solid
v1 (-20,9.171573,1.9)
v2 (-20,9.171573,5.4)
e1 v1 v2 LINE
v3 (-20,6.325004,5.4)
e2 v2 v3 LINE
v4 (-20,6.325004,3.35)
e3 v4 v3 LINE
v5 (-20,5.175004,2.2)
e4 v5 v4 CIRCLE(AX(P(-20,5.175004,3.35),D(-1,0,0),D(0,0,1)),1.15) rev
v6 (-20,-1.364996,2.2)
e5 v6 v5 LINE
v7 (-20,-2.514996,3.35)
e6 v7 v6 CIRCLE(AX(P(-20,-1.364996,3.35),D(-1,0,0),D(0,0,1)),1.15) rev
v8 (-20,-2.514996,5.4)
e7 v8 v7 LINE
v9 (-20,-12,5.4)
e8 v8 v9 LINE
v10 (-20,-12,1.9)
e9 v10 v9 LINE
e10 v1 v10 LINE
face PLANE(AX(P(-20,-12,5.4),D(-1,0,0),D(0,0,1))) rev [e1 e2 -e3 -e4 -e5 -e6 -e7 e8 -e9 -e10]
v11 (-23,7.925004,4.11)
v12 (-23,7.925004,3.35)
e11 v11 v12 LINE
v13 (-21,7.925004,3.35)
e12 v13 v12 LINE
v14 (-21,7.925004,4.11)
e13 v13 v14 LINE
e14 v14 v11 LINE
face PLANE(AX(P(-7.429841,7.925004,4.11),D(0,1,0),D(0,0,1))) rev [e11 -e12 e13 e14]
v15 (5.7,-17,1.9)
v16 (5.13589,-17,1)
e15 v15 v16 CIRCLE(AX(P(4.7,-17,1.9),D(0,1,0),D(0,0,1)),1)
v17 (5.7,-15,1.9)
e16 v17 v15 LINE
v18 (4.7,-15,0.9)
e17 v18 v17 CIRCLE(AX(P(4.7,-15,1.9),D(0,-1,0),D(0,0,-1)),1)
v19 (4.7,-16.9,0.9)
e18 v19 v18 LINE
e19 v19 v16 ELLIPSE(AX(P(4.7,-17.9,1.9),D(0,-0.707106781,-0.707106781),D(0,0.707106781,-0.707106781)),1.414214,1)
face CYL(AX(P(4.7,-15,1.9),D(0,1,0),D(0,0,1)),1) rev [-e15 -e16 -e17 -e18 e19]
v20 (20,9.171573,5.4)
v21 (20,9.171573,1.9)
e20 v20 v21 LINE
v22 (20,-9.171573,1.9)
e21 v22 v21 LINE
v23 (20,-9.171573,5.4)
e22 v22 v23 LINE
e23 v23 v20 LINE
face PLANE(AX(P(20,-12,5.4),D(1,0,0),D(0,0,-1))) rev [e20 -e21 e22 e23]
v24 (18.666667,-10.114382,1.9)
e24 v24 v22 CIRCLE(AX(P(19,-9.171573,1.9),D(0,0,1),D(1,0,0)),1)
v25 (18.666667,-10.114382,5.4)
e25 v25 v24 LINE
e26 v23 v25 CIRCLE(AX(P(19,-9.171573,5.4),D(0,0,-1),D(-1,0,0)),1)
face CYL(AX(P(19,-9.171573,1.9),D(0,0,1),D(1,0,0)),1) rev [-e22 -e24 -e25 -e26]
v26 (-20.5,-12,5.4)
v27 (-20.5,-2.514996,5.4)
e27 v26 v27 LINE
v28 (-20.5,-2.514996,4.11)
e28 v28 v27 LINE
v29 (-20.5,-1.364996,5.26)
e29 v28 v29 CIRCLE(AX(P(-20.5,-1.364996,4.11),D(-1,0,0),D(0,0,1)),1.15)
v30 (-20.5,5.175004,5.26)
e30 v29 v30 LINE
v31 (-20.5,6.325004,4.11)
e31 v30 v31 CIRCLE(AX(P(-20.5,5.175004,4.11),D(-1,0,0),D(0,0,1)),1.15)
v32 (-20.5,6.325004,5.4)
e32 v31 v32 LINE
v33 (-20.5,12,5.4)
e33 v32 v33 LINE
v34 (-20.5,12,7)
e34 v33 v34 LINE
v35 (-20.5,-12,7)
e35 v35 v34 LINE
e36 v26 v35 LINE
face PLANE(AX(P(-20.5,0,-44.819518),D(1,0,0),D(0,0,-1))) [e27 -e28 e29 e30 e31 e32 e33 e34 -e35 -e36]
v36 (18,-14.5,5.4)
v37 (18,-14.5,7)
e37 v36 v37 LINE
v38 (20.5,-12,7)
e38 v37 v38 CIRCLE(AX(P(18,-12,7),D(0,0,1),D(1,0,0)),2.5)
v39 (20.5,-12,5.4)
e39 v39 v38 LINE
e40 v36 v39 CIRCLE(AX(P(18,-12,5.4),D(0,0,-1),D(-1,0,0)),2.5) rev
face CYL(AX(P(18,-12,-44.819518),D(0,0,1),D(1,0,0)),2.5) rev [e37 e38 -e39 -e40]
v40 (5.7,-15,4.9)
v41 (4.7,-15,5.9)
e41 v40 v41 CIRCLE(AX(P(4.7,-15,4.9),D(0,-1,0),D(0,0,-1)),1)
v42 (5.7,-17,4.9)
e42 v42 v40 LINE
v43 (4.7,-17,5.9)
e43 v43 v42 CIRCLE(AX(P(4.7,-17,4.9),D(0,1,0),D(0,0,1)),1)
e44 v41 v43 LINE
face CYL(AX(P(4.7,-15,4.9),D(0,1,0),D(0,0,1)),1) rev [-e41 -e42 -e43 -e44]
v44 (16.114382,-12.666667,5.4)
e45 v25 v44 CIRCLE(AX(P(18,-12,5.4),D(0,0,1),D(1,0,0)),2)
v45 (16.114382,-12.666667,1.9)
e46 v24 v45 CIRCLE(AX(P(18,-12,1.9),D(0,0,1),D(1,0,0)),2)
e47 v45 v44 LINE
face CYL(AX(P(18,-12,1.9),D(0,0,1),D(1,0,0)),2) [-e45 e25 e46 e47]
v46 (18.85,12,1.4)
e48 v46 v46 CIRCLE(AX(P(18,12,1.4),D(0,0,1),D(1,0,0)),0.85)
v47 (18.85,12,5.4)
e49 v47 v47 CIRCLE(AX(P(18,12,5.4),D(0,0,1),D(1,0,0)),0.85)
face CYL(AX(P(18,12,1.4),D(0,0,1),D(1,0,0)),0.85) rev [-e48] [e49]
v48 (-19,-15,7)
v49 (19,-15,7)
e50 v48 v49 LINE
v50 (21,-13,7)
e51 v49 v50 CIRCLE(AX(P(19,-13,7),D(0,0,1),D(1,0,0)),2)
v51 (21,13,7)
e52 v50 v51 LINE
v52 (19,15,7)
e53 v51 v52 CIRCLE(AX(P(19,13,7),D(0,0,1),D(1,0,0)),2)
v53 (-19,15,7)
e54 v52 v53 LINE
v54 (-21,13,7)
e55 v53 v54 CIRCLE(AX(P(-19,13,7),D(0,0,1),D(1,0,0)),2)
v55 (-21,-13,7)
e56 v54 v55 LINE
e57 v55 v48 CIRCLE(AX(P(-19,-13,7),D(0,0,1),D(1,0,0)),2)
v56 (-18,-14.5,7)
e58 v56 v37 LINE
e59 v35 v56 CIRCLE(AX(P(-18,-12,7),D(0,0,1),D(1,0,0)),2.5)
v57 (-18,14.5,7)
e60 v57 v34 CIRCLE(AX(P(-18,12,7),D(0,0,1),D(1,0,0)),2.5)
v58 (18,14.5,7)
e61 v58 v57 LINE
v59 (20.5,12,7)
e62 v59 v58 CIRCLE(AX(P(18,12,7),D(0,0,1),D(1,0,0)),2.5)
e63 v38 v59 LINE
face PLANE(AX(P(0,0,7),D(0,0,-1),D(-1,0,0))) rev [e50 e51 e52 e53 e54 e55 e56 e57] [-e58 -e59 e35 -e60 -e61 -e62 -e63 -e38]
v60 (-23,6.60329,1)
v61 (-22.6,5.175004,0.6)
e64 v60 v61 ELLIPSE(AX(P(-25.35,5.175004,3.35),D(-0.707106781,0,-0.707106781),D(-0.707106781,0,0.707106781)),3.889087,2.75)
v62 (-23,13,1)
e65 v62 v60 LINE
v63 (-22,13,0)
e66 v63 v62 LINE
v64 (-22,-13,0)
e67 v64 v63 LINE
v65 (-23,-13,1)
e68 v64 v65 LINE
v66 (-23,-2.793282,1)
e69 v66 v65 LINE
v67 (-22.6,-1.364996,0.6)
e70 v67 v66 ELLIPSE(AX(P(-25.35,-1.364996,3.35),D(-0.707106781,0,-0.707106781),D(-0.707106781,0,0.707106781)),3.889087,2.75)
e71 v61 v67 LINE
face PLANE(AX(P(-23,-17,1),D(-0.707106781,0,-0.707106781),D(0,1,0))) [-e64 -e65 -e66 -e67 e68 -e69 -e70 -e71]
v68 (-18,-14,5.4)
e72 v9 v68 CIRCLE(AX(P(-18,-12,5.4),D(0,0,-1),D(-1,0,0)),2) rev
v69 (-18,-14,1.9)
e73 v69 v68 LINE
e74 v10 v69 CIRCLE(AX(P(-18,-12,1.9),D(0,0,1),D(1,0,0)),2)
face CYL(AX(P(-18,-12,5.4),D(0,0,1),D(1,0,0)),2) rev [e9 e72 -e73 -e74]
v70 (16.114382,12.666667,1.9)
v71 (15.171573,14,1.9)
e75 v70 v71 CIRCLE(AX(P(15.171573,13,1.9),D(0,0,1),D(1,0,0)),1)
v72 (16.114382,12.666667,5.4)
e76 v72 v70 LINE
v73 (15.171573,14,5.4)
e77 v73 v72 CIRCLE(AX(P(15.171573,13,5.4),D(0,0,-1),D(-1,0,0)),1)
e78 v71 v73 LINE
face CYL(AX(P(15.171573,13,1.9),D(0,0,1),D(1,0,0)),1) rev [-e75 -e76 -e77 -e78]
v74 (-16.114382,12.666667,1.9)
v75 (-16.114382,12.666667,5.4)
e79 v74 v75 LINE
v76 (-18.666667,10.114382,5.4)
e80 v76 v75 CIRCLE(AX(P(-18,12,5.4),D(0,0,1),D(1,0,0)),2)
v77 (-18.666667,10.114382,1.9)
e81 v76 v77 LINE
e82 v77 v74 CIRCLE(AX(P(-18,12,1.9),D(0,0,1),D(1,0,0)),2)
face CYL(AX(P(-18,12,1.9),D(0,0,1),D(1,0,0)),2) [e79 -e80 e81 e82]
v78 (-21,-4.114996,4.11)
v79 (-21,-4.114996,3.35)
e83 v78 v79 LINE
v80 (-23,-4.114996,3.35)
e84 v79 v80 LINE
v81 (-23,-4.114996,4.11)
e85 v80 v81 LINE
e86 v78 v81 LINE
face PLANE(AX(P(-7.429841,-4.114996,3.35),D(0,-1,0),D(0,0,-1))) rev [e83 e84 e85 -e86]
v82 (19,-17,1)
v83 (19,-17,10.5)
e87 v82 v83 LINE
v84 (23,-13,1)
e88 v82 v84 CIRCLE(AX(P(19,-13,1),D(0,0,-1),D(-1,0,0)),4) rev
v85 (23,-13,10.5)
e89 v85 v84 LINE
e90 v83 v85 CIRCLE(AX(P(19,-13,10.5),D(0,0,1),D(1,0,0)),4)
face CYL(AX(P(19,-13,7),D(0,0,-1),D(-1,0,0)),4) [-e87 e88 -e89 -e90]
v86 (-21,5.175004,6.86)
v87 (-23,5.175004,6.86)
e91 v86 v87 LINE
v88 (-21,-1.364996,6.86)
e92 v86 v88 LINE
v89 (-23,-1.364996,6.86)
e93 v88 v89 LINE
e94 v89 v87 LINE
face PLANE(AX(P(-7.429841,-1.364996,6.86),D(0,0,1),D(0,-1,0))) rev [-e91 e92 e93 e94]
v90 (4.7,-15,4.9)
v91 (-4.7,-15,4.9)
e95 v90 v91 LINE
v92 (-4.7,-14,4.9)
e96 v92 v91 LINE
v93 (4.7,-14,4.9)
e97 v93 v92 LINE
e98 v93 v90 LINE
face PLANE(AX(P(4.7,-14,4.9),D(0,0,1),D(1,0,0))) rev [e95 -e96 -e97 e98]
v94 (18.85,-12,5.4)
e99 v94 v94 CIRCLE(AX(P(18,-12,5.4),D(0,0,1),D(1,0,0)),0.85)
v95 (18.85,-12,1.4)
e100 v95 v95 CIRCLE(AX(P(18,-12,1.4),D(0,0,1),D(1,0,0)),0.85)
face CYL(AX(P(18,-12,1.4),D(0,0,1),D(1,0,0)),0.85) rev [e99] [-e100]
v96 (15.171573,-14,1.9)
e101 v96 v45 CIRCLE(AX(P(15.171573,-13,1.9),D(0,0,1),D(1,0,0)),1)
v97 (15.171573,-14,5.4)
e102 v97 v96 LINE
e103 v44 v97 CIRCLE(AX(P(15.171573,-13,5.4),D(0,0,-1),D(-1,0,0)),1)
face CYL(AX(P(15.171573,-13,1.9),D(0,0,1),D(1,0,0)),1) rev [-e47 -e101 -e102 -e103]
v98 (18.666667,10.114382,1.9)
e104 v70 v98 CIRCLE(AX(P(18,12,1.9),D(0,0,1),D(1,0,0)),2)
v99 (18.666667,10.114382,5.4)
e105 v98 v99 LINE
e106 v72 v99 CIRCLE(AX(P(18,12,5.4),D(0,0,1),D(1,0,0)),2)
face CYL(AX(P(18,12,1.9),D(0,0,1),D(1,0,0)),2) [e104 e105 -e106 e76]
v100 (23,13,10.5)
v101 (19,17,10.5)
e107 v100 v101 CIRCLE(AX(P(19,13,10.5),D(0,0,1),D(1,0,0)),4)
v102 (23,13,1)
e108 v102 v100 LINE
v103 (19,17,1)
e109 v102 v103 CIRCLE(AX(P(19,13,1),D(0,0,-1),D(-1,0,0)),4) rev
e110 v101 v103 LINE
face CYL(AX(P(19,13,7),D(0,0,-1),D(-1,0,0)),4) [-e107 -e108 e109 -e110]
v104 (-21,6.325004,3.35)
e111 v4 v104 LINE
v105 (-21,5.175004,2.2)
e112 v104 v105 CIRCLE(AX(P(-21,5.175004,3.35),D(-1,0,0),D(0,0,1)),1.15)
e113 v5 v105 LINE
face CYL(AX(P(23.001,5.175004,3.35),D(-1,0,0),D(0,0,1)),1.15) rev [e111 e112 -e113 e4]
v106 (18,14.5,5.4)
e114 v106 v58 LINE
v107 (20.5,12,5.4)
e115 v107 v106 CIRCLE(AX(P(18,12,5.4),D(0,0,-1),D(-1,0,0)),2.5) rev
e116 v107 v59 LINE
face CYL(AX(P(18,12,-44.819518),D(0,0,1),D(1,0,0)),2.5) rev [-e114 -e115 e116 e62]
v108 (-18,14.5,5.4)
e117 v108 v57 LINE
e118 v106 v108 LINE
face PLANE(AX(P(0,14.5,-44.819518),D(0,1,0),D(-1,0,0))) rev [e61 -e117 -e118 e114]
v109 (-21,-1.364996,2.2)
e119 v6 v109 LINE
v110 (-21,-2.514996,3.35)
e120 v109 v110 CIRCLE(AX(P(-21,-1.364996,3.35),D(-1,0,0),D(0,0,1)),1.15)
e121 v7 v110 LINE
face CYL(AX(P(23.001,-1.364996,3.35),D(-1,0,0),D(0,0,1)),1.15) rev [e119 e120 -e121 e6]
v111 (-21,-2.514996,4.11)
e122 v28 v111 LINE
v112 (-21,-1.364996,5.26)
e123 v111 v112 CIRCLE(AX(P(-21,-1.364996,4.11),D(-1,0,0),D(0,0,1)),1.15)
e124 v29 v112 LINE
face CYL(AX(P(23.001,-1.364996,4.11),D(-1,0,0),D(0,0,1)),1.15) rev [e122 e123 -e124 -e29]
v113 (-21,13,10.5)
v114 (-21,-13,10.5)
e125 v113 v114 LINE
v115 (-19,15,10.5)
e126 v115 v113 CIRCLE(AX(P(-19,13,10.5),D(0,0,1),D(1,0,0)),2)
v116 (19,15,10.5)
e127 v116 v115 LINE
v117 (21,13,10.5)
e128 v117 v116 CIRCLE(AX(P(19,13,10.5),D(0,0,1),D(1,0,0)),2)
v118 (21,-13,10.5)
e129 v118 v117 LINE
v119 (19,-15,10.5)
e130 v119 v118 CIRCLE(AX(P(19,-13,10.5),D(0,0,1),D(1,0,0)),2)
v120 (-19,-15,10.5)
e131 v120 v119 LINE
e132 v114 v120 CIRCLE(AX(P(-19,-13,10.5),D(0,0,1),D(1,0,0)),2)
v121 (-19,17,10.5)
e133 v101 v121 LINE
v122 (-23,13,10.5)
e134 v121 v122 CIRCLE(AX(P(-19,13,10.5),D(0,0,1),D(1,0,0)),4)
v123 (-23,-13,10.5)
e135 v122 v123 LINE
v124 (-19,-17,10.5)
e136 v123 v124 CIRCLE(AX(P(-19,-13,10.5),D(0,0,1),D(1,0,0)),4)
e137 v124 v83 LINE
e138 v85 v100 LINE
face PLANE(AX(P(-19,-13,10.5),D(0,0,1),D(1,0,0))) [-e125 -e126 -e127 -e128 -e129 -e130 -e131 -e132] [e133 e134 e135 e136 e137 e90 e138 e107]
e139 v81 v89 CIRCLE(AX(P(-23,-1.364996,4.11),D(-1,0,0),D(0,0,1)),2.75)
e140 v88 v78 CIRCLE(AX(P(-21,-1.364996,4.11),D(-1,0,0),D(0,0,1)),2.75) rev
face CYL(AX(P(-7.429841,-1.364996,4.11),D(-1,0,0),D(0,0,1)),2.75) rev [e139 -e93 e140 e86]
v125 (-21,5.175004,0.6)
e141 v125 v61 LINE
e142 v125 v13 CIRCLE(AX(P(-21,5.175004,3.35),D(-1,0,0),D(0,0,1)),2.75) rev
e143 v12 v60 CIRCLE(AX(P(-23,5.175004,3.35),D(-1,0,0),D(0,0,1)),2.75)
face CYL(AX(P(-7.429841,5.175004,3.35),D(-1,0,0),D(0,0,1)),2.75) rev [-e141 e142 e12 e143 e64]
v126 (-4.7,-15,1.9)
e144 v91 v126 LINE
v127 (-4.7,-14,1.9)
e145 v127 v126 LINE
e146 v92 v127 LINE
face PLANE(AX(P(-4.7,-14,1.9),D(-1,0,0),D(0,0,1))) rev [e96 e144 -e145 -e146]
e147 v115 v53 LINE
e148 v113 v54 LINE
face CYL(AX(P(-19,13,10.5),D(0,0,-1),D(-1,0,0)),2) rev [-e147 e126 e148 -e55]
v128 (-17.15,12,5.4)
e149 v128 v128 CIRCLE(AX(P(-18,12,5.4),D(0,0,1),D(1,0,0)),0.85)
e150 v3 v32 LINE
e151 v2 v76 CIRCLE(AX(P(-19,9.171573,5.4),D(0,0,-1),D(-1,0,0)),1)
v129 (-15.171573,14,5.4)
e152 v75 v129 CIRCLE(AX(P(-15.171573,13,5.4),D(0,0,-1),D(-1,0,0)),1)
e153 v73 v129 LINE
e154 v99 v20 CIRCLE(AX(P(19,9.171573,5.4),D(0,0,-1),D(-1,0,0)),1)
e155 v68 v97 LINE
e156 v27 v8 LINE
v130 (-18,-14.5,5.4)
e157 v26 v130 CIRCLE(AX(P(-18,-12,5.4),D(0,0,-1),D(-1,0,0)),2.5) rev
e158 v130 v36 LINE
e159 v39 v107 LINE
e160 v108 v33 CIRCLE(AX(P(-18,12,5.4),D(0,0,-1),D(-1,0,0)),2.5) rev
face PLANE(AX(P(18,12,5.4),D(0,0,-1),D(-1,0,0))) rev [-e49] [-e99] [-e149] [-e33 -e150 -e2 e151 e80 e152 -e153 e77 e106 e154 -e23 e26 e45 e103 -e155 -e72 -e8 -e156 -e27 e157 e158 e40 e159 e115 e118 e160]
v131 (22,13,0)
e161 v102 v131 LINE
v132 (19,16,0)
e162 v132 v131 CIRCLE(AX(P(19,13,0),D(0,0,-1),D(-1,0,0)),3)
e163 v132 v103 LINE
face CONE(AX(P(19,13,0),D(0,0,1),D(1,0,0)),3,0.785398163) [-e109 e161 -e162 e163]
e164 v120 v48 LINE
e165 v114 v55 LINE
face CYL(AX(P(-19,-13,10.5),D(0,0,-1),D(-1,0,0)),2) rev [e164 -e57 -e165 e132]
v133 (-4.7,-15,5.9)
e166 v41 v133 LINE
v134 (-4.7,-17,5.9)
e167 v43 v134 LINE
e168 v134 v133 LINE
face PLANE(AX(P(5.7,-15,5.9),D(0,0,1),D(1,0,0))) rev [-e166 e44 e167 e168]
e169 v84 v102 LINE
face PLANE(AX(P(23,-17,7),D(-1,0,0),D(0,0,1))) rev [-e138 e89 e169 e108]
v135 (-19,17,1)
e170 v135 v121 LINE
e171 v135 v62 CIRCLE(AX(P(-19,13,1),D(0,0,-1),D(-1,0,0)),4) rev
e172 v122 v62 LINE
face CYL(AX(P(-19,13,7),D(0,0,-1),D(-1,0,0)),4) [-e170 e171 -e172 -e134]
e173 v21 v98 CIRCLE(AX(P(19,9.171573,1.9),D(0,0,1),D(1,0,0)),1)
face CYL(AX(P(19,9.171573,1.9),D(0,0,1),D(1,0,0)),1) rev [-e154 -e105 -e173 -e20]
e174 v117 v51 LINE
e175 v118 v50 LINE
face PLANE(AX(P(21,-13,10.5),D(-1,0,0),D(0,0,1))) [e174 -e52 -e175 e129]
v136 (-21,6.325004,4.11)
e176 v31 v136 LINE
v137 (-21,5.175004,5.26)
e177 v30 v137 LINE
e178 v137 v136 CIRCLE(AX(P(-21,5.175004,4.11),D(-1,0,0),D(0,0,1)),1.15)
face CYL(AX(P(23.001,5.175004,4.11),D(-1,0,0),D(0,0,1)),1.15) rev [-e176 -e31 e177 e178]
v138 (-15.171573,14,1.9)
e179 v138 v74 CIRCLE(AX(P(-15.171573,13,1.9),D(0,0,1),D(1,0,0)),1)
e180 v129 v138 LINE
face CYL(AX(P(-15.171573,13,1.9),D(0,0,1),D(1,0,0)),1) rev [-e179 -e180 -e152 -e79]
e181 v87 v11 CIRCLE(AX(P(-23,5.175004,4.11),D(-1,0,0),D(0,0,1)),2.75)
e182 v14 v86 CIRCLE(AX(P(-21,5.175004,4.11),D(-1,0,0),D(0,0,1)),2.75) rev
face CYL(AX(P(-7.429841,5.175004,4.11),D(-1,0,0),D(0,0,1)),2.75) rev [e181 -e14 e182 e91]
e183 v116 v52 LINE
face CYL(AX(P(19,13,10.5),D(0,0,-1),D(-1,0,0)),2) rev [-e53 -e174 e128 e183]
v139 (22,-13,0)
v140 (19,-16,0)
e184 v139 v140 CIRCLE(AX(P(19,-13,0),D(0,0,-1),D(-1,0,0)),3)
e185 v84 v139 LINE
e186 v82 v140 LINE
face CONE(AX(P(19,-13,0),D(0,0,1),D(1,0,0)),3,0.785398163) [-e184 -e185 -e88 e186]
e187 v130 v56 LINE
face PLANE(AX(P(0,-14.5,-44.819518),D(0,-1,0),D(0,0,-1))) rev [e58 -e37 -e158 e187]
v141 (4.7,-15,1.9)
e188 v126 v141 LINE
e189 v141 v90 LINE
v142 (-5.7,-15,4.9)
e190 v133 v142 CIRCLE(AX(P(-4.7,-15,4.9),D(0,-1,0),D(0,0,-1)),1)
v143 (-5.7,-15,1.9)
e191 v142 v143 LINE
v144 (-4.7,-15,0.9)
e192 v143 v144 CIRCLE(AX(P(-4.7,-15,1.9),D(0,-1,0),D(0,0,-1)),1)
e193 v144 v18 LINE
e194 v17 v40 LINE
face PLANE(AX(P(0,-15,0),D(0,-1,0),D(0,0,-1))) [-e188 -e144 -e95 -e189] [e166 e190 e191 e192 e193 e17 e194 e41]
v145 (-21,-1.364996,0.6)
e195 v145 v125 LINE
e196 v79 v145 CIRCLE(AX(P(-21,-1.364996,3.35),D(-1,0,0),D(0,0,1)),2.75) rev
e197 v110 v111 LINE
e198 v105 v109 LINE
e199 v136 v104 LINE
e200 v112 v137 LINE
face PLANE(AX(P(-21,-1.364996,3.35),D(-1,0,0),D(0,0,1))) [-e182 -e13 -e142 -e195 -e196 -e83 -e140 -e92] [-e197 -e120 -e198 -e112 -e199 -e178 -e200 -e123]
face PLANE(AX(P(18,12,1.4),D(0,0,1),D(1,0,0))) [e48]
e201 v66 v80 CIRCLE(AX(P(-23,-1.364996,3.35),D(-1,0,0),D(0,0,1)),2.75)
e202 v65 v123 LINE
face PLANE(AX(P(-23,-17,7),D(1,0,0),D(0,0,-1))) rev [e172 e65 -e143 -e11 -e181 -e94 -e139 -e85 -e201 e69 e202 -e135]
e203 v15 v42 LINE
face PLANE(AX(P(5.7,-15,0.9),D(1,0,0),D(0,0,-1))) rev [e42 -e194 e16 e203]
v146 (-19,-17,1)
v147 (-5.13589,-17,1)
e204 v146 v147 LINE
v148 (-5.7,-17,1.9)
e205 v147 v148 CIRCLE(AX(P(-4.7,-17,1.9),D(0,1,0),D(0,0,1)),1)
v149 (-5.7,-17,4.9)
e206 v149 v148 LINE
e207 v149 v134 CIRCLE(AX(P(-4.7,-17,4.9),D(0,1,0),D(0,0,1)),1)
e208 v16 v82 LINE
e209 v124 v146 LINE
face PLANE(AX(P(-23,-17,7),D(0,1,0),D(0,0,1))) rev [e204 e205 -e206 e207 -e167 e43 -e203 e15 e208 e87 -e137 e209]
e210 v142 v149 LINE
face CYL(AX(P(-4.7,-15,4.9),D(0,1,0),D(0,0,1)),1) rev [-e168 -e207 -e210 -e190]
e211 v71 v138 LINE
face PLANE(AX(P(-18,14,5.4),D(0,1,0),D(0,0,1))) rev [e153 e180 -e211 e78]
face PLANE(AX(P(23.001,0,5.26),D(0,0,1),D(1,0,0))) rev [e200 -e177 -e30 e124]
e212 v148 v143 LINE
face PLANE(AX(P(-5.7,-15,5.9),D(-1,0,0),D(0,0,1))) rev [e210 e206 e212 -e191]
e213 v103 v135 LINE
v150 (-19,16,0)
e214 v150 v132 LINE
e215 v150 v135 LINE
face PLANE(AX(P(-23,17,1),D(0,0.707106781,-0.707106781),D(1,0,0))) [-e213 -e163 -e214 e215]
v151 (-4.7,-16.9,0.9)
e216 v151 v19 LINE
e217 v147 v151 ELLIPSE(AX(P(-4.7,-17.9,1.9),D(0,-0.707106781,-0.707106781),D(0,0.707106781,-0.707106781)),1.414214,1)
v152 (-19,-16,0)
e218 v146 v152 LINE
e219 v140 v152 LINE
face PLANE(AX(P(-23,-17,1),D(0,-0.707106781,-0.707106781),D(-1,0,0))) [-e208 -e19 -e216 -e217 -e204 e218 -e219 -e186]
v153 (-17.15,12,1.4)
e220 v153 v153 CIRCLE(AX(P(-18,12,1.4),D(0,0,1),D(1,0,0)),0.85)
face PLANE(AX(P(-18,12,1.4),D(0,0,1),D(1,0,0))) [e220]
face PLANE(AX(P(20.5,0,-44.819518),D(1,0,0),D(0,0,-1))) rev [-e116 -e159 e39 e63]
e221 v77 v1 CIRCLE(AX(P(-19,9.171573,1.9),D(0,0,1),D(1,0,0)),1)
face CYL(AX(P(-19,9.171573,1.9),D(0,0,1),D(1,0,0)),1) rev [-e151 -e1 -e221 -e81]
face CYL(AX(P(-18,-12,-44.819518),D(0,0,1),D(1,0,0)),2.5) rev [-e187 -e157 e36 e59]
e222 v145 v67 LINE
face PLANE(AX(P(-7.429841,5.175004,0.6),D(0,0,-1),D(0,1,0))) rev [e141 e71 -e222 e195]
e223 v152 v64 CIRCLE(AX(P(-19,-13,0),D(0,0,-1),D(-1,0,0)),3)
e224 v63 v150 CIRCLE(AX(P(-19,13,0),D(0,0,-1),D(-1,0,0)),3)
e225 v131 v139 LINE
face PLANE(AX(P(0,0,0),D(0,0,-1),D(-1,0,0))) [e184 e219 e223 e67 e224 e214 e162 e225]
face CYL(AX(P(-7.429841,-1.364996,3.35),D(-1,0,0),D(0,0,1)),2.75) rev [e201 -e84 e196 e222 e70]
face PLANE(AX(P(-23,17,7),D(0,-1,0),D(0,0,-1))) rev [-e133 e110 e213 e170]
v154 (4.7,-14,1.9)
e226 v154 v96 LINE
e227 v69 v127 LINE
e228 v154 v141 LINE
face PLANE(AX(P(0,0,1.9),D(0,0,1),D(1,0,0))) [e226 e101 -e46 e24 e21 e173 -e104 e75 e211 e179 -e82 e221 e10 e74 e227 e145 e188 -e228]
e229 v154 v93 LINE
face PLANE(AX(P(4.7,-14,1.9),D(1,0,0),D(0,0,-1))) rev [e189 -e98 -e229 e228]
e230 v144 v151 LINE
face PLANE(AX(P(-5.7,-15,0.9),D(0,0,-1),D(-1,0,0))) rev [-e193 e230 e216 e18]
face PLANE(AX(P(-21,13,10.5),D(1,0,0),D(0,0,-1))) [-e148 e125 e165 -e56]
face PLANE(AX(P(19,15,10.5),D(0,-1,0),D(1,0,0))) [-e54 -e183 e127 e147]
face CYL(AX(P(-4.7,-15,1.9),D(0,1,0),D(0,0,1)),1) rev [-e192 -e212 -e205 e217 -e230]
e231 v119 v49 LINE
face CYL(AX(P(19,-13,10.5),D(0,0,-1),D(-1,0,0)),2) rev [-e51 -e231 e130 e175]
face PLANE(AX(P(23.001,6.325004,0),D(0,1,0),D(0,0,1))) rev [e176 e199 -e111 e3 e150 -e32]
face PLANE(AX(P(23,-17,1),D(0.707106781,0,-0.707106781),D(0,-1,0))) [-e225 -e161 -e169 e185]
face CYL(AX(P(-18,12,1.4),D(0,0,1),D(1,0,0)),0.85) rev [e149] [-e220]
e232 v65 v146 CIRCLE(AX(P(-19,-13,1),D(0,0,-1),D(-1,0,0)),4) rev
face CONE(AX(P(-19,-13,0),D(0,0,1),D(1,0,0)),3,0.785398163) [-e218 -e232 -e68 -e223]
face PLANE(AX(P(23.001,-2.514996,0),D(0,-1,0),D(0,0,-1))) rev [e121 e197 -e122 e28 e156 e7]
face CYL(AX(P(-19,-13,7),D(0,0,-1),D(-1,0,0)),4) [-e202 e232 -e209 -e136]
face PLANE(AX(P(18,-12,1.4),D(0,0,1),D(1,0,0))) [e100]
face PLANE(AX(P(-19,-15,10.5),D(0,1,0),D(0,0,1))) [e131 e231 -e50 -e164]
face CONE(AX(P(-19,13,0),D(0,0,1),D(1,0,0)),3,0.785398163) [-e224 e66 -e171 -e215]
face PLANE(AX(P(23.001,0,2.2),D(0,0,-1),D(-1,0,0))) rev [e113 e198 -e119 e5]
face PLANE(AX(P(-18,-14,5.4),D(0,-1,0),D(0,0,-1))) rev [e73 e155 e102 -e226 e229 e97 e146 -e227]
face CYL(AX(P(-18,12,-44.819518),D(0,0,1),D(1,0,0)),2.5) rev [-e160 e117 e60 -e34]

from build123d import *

# Parameters (mm, degrees)
SKETCH_1_W           = 46
SKETCH_1_H           = 34
EXTRUDE_1_DEPTH      = 7
CUT_EXTRUDE_1_DEPTH  = 1.6
CUT_EXTRUDE_2_DEPTH  = 3.5
FILLET_1_R           = 1
FILLET_2_R           = 4
SKETCH_5_R           = 0.85
CUT_EXTRUDE_3_DEPTH  = 4
CUT_EXTRUDE_4_REACH  = 51.538
CUT_EXTRUDE_5_DEPTH  = 2
SKETCH_7_W           = 9.4
SKETCH_7_H           = 3
CUT_EXTRUDE_6_DEPTH  = 3
SKETCH_8_W           = 11.4
SKETCH_8_H           = 5
SKETCH_8_W_2         = 9.4
SKETCH_8_H_2         = 3
CUT_EXTRUDE_7_DEPTH  = 2
FILLET_3_R           = 1
EXTRUDE_START        = 3.5
EXTRUDE_2_DEPTH      = 3.5
CHAMFER_1_SIZE       = 1
CUT_EXTRUDE_9_DEPTH  = 1.6
CUT_EXTRUDE_10_REACH = 31.106
SKETCH_11_W          = 0.5
SKETCH_11_H          = 8.840000414
CUT_EXTRUDE_11_DEPTH = 2


with BuildPart() as part:
    # 草图1 → 凸台-拉伸1 (new body)
    with BuildSketch(Plane.XY):
        Rectangle(SKETCH_1_W, SKETCH_1_H)
    extrude(amount=EXTRUDE_1_DEPTH)

    # 草图3 → 切除-拉伸1 (cut)
    with BuildSketch(Plane.XY.offset(7)):
        with BuildLine():
            Line((-18, -14), (18, -14))
            ThreePointArc((18, -14), (19.414213562, -13.414213562), (20, -12))
            Line((20, -12), (20, 12))
            ThreePointArc((20, 12), (19.414213562, 13.414213562), (18, 14))
            Line((18, 14), (-18, 14))
            ThreePointArc((-18, 14), (-19.414213562, 13.414213562), (-20, 12))
            Line((-20, 12), (-20, -12))
            ThreePointArc((-20, -12), (-19.414213562, -13.414213562), (-18, -14))
        make_face()
    extrude(amount=-CUT_EXTRUDE_1_DEPTH, mode=Mode.SUBTRACT)

    # 草图4 → 切除-拉伸2 (cut)
    with BuildSketch(Plane.XY.offset(5.4)):
        with BuildLine():
            ThreePointArc((20, 12), (16.585786438, 10.585786438), (18, 14))
            Line((18, 14), (-18, 14))
            ThreePointArc((-18, 14), (-16.585786438, 13.414213562), (-16, 12))
            ThreePointArc((-16, 12), (-18, 10), (-20, 12))
            Line((-20, 12), (-20, -12))
            ThreePointArc((-20, -12), (-19.414213562, -13.414213562), (-18, -14))
            Line((-18, -14), (18, -14))
            ThreePointArc((18, -14), (16.585786438, -10.585786438), (20, -12))
            Line((20, -12), (20, 12))
        make_face()
    extrude(amount=-CUT_EXTRUDE_2_DEPTH, mode=Mode.SUBTRACT)

    # 圆角1
    fillet_1_edges = [part.edges().sort_by_distance(p)[0] for p in [
        (18, 14, 3.65),
        (20, 12, 3.65),
        (20, -12, 3.65),
        (18, -14, 3.65),
        (-20, 12, 3.65),
        (-18, 14, 3.65),
    ]]
    fillet(fillet_1_edges, radius=FILLET_1_R)

    # 圆角2
    fillet_2_edges = [part.edges().sort_by_distance(p)[0] for p in [
        (23, -17, 3.5),
        (-23, -17, 3.5),
        (-23, 17, 3.5),
        (23, 17, 3.5),
    ]]
    fillet(fillet_2_edges, radius=FILLET_2_R)

    # 草图5 → 切除-拉伸3 (cut)
    with BuildSketch(Plane.XY.offset(5.4)):
        with Locations((-18, 12)):
            Circle(SKETCH_5_R)
        with Locations((18, 12)):
            Circle(SKETCH_5_R)
        with Locations((18, -12)):
            Circle(SKETCH_5_R)
    extrude(amount=-CUT_EXTRUDE_3_DEPTH, mode=Mode.SUBTRACT)

    # 草图6 → 切除-拉伸4 (cut, up to next)
    with BuildSketch(Plane.ZY.offset(23), mode=Mode.PRIVATE) as cut_extrude_4_sk1:
        with BuildLine():
            Line((4.109999831, 6.325004017), (3.349999795, 6.325004017))
            ThreePointArc((3.349999795, 6.325004017), (2.536826958, 5.9881768), (2.199999741, 5.175003963))
            Line((2.199999741, 5.175003963), (2.199999741, -1.364996343))
            ThreePointArc((2.199999741, -1.364996343), (2.536826958, -2.17816918), (3.349999795, -2.514996397))
            Line((3.349999795, -2.514996397), (4.109999831, -2.514996397))
            ThreePointArc((4.109999831, -2.514996397), (4.923172667, -2.17816918), (5.259999885, -1.364996343))
            Line((5.259999885, -1.364996343), (5.259999885, 5.175003963))
            ThreePointArc((5.259999885, 5.175003963), (4.923172667, 5.9881768), (4.109999831, 6.325004017))
        make_face()
    cut_extrude_4_tool1 = extrude(cut_extrude_4_sk1.sketch, amount=-CUT_EXTRUDE_4_REACH, mode=Mode.PRIVATE) & part.part
    add(cut_extrude_4_tool1.solids().sort_by_distance((-23, 1.905004, 3.73))[0], mode=Mode.SUBTRACT)

    # 草图6<3> → 切除-拉伸5 (cut)
    with BuildSketch(Plane.ZY.offset(23)):
        with BuildLine():
            Line((3.349999795, -4.014996397), (4.109999831, -4.014996397))
            ThreePointArc((4.109999831, -4.014996397), (5.983832839, -3.238829352), (6.759999885, -1.364996343))
            Line((6.759999885, -1.364996343), (6.759999885, 5.175003963))
            ThreePointArc((6.759999885, 5.175003963), (5.983832839, 7.048836972), (4.109999831, 7.825004017))
            Line((4.109999831, 7.825004017), (3.349999795, 7.825004017))
            ThreePointArc((3.349999795, 7.825004017), (1.476166787, 7.048836972), (0.699999741, 5.175003963))
            Line((0.699999741, 5.175003963), (0.699999741, -1.364996343))
            ThreePointArc((0.699999741, -1.364996343), (1.476166787, -3.238829352), (3.349999795, -4.014996397))
        make_face()
        with BuildLine():
            Line((3.349999795, -2.514996397), (4.109999831, -2.514996397))
            ThreePointArc((4.109999831, -2.514996397), (4.923172667, -2.17816918), (5.259999885, -1.364996343))
            Line((5.259999885, -1.364996343), (5.259999885, 5.175003963))
            ThreePointArc((5.259999885, 5.175003963), (4.923172667, 5.9881768), (4.109999831, 6.325004017))
            Line((4.109999831, 6.325004017), (3.349999795, 6.325004017))
            ThreePointArc((3.349999795, 6.325004017), (2.536826958, 5.9881768), (2.199999741, 5.175003963))
            Line((2.199999741, 5.175003963), (2.199999741, -1.364996343))
            ThreePointArc((2.199999741, -1.364996343), (2.536826958, -2.17816918), (3.349999795, -2.514996397))
        make_face(mode=Mode.SUBTRACT)
    extrude(amount=-CUT_EXTRUDE_5_DEPTH, mode=Mode.SUBTRACT)

    # 草图7 → 切除-拉伸6 (cut)
    with BuildSketch(Plane.XZ.offset(17)):
        with Locations((0, 3.4)):
            Rectangle(SKETCH_7_W, SKETCH_7_H)
    extrude(amount=-CUT_EXTRUDE_6_DEPTH, mode=Mode.SUBTRACT)

    # 草图8 → 切除-拉伸7 (cut)
    with BuildSketch(Plane.XZ.offset(17)):
        with Locations((0, 3.4)):
            Rectangle(SKETCH_8_W, SKETCH_8_H)
        with Locations((0, 3.4)):
            Rectangle(SKETCH_8_W_2, SKETCH_8_H_2, mode=Mode.SUBTRACT)
    extrude(amount=-CUT_EXTRUDE_7_DEPTH, mode=Mode.SUBTRACT)

    # 圆角3
    fillet_3_edges = [part.edges().sort_by_distance(p)[0] for p in [
        (5.7, -16, 0.9),
        (-5.7, -16, 0.9),
        (-5.7, -16, 5.9),
        (5.7, -16, 5.9),
    ]]
    fillet(fillet_3_edges, radius=FILLET_3_R)

    # 草图9 → 凸台-拉伸2 (add)
    with BuildSketch(Plane.XY.offset(7).offset(EXTRUDE_START)):
        with BuildLine():
            Line((-19, -17), (19, -17))
            ThreePointArc((19, -17), (21.828427125, -15.828427125), (23, -13))
            Line((23, -13), (23, 13))
            ThreePointArc((23, 13), (21.828427125, 15.828427125), (19, 17))
            Line((19, 17), (-19, 17))
            ThreePointArc((-19, 17), (-21.828427125, 15.828427125), (-23, 13))
            Line((-23, 13), (-23, -13))
            ThreePointArc((-23, -13), (-21.828427125, -15.828427125), (-19, -17))
        make_face()
        with BuildLine():
            Line((-19, -15), (19, -15))
            ThreePointArc((19, -15), (20.414213562, -14.414213562), (21, -13))
            Line((21, -13), (21, 13))
            ThreePointArc((21, 13), (20.414213562, 14.414213562), (19, 15))
            Line((19, 15), (-19, 15))
            ThreePointArc((-19, 15), (-20.414213562, 14.414213562), (-21, 13))
            Line((-21, 13), (-21, -13))
            ThreePointArc((-21, -13), (-20.414213562, -14.414213562), (-19, -15))
        make_face(mode=Mode.SUBTRACT)
    extrude(amount=-EXTRUDE_2_DEPTH)

    # 倒角1
    # the kernel refuses this chamfer: 1 mm, written as the material it takes off along each edge
    with BuildSketch(Plane(origin=(19, 13, 0), x_dir=(1, 0, 0), z_dir=(0, -1, 0))) as chamfer_1_piece_1:
        Polygon((4, CHAMFER_1_SIZE), (4 - CHAMFER_1_SIZE, 0), (4, 0), align=None)
    revolve(axis=Axis((19, 13, 0), (0, 0, 1)), revolution_arc=90, mode=Mode.SUBTRACT)
    with BuildSketch(Plane(origin=(19, 17, 0), x_dir=(0, 0.02749587661058563, 0.9996219169112968), z_dir=(-1, 0, 0)), Plane(origin=(-19, -17, 0), x_dir=(0, -0.02749587661058563, 0.9996219169112968), z_dir=(1, 0, 0))) as chamfer_1_piece_2:
        Polygon((CHAMFER_1_SIZE * 0.999621916911, -CHAMFER_1_SIZE * 0.0274958766106), (-CHAMFER_1_SIZE * 0.0274958766106, -CHAMFER_1_SIZE * 0.999621916911), (0, 0), align=None)
    extrude(amount=38, mode=Mode.SUBTRACT)
    with BuildSketch(Plane(origin=(-19, 13, 0), x_dir=(-1, 0, 0), z_dir=(0, -1, 0))) as chamfer_1_piece_3:
        Polygon((4, -CHAMFER_1_SIZE), (4 - CHAMFER_1_SIZE, 0), (4, 0), align=None)
    revolve(axis=Axis((-19, 13, 0), (0, 0, -1)), revolution_arc=90, mode=Mode.SUBTRACT)
    with BuildSketch(Plane(origin=(-23, 13, 0), x_dir=(-0.02749587661058563, 0, 0.9996219169112968), z_dir=(0, -1, 0)), Plane(origin=(23, -13, 0), x_dir=(0.02749587661058563, 0, 0.9996219169112968), z_dir=(0, 1, 0))) as chamfer_1_piece_4:
        Polygon((CHAMFER_1_SIZE * 0.999621916911, -CHAMFER_1_SIZE * 0.0274958766106), (-CHAMFER_1_SIZE * 0.0274958766106, -CHAMFER_1_SIZE * 0.999621916911), (0, 0), align=None)
    extrude(amount=26, mode=Mode.SUBTRACT)
    with BuildSketch(Plane(origin=(-19, -13, 0), x_dir=(0, -1, 0), z_dir=(1, 0, 0))) as chamfer_1_piece_5:
        Polygon((4, -CHAMFER_1_SIZE), (4 - CHAMFER_1_SIZE, 0), (4, 0), align=None)
    revolve(axis=Axis((-19, -13, 0), (0, 0, -1)), revolution_arc=90, mode=Mode.SUBTRACT)
    with BuildSketch(Plane(origin=(19, -13, 0), x_dir=(0, -1, 0), z_dir=(-1, 0, 0))) as chamfer_1_piece_6:
        Polygon((4, CHAMFER_1_SIZE), (4 - CHAMFER_1_SIZE, 0), (4, 0), align=None)
    revolve(axis=Axis((19, -13, 0), (0, 0, 1)), revolution_arc=90, mode=Mode.SUBTRACT)

    # 草图10 → 切除-拉伸9 (cut)
    # profile 1 of 2: a face of its own
    with BuildSketch(Plane.XY.offset(7)):
        with BuildLine():
            Line((-18, -14.5), (18, -14.5))
            ThreePointArc((18, -14.5), (19.767766953, -13.767766953), (20.5, -12))
            Line((20.5, -12), (20.5, 12))
            ThreePointArc((20.5, 12), (19.767766953, 13.767766953), (18, 14.5))
            Line((18, 14.5), (-18, 14.5))
            ThreePointArc((-18, 14.5), (-19.767766953, 13.767766953), (-20.5, 12))
            Line((-20.5, 12), (-20.5, 9.171572875))
            Line((-20.5, 9.171572875), (-20.5, -12))
            ThreePointArc((-20.5, -12), (-19.767766953, -13.767766953), (-18, -14.5))
        make_face()
        with BuildLine():
            ThreePointArc((-20, 12), (-19.414213562, 13.414213562), (-18, 14))
            Line((-18, 14), (18, 14))
            ThreePointArc((18, 14), (19.414213562, 13.414213562), (20, 12))
            Line((20, 12), (20, -12))
            ThreePointArc((20, -12), (19.414213562, -13.414213562), (18, -14))
            Line((18, -14), (-18, -14))
            ThreePointArc((-18, -14), (-19.414213562, -13.414213562), (-20, -12))
            Line((-20, -12), (-20, 12))
        make_face(mode=Mode.SUBTRACT)
    # profile 2 of 2: a face of its own
    with BuildSketch(Plane.XY.offset(7)):
        with BuildLine():
            ThreePointArc((20, 12), (19.414213562, 13.414213562), (18, 14))
            Line((18, 14), (-18, 14))
            ThreePointArc((-18, 14), (-19.414213562, 13.414213562), (-20, 12))
            Line((-20, 12), (-20, 9.171572875))
            Line((-20, 9.171572875), (-20, -12))
            ThreePointArc((-20, -12), (-19.414213562, -13.414213562), (-18, -14))
            Line((-18, -14), (18, -14))
            ThreePointArc((18, -14), (19.414213562, -13.414213562), (20, -12))
            Line((20, -12), (20, 12))
        make_face()
    extrude(amount=-CUT_EXTRUDE_9_DEPTH, mode=Mode.SUBTRACT)

    # 草图11 → 切除-拉伸10 (cut, up to next)
    with BuildSketch(Plane.XY.offset(5.4), mode=Mode.PRIVATE) as cut_extrude_10_sk1:
        with Locations((-20.25, 1.90500381)):
            Rectangle(SKETCH_11_W, SKETCH_11_H)
    cut_extrude_10_tool1 = extrude(cut_extrude_10_sk1.sketch, amount=-CUT_EXTRUDE_10_REACH, mode=Mode.PRIVATE) & part.part
    add(cut_extrude_10_tool1.solids().sort_by_distance((-20.25, 1.905004, 5.4))[0], mode=Mode.SUBTRACT)

    # 草图12 → 切除-拉伸11 (cut)
    with BuildSketch(Plane.ZY.offset(23)):
        with BuildLine():
            Line((0.599999741, 5.175003963), (0.599999741, -1.364996343))
            ThreePointArc((0.599999741, -1.364996343), (1.405456108, -3.30954003), (3.349999795, -4.114996397))
            Line((3.349999795, -4.114996397), (4.109999831, -4.114996397))
            ThreePointArc((4.109999831, -4.114996397), (6.054543517, -3.30954003), (6.859999885, -1.364996343))
            Line((6.859999885, -1.364996343), (6.859999885, 5.175003963))
            ThreePointArc((6.859999885, 5.175003963), (6.054543517, 7.11954765), (4.109999831, 7.925004017))
            Line((4.109999831, 7.925004017), (3.349999795, 7.925004017))
            ThreePointArc((3.349999795, 7.925004017), (1.405456108, 7.11954765), (0.599999741, 5.175003963))
        make_face()
    extrude(amount=-CUT_EXTRUDE_11_DEPTH, mode=Mode.SUBTRACT)


solid = part.part
